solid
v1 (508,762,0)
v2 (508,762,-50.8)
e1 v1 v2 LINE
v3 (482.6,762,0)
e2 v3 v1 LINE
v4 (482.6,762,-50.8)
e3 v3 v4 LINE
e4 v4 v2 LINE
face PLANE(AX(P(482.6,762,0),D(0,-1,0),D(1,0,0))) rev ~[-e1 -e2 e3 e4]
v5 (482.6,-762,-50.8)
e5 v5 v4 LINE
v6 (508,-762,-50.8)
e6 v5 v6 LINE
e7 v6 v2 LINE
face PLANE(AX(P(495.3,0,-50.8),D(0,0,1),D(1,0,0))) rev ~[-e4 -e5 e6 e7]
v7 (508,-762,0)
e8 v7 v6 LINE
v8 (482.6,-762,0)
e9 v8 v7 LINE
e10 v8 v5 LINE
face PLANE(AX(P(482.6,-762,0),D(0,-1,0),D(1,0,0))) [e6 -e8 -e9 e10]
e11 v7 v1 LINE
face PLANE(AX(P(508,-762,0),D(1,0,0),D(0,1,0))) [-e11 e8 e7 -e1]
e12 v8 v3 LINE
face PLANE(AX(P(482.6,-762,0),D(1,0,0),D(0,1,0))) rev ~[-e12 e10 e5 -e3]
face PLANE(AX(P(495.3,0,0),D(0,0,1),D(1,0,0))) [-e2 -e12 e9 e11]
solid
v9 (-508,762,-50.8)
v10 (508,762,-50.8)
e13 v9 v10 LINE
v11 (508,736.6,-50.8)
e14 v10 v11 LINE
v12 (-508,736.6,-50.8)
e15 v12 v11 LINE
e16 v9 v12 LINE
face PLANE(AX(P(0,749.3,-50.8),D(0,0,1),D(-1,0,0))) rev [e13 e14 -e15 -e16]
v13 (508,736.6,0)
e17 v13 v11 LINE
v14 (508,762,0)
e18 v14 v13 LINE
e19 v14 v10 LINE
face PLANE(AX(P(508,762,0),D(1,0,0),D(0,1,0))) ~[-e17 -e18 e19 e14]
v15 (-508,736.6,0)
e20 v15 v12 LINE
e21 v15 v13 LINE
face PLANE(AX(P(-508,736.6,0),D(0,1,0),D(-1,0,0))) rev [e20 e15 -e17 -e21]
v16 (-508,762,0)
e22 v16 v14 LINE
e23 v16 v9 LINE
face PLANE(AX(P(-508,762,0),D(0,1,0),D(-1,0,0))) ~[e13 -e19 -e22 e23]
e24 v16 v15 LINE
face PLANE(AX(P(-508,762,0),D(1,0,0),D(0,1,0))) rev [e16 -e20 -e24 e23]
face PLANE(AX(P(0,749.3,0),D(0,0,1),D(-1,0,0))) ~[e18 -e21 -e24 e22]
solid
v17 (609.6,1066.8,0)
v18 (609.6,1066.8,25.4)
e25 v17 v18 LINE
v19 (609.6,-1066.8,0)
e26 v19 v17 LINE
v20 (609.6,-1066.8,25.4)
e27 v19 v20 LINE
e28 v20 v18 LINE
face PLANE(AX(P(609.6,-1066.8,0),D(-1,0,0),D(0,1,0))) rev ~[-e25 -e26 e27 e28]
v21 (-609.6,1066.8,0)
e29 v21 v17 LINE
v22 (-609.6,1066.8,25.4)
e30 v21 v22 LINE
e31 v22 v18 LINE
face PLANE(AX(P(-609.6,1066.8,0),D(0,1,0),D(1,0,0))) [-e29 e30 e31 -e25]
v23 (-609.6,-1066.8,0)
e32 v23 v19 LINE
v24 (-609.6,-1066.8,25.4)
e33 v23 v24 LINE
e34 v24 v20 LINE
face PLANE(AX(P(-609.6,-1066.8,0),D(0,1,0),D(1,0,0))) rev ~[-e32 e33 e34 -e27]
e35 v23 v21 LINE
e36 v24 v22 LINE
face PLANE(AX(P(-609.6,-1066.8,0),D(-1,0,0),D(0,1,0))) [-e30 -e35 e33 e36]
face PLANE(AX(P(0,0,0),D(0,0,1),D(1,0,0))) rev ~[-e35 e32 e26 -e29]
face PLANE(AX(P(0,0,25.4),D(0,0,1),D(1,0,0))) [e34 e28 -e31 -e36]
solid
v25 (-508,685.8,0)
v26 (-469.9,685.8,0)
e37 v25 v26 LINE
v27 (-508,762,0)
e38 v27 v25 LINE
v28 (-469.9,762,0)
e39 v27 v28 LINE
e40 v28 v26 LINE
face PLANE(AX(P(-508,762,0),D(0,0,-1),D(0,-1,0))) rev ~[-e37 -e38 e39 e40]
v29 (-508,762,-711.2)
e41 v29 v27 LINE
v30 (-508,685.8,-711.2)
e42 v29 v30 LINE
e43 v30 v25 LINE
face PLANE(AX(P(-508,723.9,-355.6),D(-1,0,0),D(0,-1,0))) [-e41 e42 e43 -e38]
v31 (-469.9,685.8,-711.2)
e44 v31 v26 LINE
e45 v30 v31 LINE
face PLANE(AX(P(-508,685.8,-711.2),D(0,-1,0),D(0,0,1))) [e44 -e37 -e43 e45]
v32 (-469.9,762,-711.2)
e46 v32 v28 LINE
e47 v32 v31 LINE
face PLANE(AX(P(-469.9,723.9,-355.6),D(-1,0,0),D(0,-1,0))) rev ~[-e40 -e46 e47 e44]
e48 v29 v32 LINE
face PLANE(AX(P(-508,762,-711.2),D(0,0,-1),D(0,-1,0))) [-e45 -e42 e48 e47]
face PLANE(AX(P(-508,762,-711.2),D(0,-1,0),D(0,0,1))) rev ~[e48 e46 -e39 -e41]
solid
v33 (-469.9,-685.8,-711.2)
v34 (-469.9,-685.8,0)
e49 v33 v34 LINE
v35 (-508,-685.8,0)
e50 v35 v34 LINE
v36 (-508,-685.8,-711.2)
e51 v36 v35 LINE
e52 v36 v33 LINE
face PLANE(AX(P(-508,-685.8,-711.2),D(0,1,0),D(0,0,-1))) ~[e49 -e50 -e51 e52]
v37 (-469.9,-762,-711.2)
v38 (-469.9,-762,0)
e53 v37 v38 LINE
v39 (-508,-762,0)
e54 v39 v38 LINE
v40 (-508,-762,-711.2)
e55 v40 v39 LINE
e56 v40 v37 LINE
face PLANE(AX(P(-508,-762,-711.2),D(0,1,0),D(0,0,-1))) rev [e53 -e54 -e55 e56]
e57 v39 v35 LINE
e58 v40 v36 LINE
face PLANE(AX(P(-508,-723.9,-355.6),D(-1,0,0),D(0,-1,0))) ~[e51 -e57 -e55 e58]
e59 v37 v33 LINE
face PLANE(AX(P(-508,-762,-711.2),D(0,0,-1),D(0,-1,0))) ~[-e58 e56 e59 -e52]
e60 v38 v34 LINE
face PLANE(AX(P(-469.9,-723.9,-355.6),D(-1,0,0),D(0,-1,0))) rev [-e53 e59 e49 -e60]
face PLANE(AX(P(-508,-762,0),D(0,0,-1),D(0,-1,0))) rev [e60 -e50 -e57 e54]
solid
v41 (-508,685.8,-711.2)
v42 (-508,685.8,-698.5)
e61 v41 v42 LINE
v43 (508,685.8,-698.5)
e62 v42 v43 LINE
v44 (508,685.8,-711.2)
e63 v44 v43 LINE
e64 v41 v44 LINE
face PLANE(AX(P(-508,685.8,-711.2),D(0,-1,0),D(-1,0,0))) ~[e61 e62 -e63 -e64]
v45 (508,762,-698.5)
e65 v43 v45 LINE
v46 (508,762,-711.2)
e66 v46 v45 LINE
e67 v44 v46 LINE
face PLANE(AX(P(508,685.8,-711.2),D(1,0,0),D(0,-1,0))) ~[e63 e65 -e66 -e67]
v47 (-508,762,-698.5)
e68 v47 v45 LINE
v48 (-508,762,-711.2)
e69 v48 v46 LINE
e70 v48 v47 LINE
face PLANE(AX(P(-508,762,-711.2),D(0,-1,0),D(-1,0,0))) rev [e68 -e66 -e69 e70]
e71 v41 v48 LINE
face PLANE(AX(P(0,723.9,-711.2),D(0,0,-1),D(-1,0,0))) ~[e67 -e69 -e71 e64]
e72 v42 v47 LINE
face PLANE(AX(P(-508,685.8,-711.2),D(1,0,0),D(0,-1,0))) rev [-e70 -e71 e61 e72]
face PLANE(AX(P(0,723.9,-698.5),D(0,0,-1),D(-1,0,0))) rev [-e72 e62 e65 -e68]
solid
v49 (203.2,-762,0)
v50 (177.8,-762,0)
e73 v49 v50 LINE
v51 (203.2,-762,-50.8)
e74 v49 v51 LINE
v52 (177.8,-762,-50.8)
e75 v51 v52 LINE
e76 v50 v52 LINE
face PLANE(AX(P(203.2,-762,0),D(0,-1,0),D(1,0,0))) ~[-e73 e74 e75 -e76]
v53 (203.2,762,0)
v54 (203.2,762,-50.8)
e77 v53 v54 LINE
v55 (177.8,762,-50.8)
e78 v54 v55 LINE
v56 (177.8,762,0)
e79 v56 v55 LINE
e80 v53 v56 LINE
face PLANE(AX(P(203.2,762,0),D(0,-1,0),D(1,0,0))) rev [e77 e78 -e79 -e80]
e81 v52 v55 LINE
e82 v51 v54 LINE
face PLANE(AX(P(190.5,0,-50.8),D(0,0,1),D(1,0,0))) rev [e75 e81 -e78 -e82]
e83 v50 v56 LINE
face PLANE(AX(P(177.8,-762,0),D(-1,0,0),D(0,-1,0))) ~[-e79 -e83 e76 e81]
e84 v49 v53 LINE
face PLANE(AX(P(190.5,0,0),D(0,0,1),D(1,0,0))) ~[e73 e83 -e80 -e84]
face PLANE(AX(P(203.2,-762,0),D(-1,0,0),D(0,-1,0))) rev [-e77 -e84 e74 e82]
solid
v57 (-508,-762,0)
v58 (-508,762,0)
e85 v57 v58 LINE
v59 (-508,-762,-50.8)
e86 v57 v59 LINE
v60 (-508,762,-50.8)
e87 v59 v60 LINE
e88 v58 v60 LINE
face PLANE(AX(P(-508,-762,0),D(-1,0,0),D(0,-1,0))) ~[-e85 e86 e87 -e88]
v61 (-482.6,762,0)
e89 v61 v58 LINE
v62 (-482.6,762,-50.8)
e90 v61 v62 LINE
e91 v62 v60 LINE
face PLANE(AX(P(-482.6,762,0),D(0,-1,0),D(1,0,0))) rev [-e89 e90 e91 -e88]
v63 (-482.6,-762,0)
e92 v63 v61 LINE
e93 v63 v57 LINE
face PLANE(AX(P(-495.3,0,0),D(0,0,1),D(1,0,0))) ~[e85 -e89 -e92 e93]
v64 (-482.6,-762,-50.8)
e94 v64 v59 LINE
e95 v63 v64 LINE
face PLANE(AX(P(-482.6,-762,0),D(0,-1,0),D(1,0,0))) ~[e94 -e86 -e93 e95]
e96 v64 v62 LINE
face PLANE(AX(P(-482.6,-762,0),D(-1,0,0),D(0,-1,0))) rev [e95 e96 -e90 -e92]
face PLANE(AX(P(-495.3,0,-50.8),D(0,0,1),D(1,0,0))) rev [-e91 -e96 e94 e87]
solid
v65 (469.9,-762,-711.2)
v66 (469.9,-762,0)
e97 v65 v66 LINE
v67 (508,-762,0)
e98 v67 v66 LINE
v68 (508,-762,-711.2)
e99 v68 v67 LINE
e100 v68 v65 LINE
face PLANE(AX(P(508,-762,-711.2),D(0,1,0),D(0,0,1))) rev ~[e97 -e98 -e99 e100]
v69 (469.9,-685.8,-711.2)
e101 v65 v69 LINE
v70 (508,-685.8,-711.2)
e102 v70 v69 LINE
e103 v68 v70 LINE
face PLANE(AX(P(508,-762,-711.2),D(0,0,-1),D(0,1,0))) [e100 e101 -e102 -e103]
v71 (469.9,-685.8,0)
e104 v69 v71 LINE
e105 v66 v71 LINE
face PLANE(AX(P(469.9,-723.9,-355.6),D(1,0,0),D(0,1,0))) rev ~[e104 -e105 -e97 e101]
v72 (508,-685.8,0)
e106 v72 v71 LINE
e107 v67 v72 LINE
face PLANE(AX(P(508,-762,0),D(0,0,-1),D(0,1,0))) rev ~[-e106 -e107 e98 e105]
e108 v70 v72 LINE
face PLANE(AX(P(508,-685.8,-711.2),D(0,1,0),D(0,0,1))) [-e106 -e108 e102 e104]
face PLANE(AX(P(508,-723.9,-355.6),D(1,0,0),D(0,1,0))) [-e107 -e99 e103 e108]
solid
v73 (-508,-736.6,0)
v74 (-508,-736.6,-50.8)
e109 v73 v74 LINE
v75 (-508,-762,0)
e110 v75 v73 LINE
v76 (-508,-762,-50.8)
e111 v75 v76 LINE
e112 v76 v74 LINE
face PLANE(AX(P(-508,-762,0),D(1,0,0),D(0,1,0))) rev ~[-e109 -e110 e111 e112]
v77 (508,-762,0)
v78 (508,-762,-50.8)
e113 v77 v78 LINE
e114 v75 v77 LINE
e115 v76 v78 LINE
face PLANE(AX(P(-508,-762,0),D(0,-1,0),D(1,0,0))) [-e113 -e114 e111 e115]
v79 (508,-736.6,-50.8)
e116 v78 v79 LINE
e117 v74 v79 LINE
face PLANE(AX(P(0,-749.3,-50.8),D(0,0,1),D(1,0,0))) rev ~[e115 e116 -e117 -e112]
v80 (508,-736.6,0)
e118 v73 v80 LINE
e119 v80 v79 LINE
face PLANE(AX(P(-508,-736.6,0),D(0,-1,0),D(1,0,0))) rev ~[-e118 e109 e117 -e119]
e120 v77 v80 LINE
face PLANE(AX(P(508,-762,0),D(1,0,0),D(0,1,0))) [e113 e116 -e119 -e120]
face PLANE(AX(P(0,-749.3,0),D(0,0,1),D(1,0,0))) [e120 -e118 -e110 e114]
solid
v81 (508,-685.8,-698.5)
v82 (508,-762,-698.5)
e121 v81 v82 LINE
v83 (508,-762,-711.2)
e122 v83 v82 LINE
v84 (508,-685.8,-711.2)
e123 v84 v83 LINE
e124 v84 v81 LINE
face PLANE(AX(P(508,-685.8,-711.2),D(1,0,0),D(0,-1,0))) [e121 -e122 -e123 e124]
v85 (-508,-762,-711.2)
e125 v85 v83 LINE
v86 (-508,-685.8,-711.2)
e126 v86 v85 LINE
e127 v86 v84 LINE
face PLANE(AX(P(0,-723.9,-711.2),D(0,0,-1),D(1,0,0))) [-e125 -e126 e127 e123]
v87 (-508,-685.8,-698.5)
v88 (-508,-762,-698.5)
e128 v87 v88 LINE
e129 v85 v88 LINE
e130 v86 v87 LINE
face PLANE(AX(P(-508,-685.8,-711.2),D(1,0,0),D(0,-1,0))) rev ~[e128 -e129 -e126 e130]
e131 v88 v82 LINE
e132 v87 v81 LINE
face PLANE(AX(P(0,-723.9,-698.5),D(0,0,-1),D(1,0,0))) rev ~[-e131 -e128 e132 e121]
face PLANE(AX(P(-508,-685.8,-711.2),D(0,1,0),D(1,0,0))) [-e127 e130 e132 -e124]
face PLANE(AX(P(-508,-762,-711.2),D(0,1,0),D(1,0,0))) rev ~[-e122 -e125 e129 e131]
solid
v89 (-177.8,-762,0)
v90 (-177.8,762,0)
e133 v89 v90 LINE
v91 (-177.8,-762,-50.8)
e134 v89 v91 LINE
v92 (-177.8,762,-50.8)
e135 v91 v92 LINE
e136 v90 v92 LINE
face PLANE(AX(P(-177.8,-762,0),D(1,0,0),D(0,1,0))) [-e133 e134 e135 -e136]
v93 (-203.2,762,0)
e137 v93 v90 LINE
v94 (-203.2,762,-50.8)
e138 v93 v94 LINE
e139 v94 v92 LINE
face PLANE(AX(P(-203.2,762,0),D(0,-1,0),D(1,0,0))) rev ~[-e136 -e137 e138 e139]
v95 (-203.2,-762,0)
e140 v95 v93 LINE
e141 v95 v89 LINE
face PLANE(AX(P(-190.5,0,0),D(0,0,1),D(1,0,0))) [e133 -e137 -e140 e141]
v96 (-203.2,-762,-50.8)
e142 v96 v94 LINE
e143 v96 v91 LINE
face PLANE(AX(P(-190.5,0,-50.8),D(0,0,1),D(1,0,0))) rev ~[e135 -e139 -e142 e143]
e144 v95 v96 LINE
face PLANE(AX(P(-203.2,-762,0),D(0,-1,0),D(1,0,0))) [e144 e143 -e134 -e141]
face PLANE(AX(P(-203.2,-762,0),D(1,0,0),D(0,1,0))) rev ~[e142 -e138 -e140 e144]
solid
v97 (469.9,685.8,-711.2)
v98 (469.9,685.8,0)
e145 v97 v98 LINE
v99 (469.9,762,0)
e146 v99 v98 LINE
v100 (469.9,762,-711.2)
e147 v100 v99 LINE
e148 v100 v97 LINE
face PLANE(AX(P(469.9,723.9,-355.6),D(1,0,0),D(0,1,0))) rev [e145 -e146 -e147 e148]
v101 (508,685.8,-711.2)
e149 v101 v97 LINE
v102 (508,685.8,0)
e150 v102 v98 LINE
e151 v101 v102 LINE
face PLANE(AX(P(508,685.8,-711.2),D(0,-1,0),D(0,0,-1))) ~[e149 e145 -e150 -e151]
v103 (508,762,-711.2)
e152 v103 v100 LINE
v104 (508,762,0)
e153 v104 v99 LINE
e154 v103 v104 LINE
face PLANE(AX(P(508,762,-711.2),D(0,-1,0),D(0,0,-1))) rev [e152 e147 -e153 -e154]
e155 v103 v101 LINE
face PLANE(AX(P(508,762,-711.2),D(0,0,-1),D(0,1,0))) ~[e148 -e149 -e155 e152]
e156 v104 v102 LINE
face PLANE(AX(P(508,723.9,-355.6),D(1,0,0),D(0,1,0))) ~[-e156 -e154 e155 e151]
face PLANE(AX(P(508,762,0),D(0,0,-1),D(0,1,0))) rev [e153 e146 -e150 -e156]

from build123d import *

# Parameters (mm, degrees)
F0_W      = 1219.2
F0_H      = 2133.6
F1_DEPTH  = 25.4
F2_W      = 25.4
F2_H      = 1524
F3_DEPTH  = 50.8
F5_W      = 1016
F5_H      = 25.4
F6_DEPTH  = 50.8
F8_W      = 76.2
F8_H      = 711.2
F9_DEPTH  = 38.1
F12_W     = 1016
F12_H     = 76.2
F13_DEPTH = 12.7
F15_W     = 25.4
F15_H     = 1524
F16_DEPTH = 50.8


# Not quite as in the source:
# - a feature names something its author has since deleted; it is built from what else it names


with BuildPart() as f1:
    # F0 (on Top) → F1 (new body)
    with BuildSketch(Plane.XY):
        Rectangle(F0_W, F0_H)
    extrude(amount=F1_DEPTH)


with BuildPart() as f3:
    # F2 (on face) → F3 (new body)
    with BuildSketch(Plane.XY):
        with Locations((495.3, 0)):
            Rectangle(F2_W, F2_H)
    extrude(amount=-F3_DEPTH)


with BuildPart() as f4_1:
    # F4: instance of F3
    add(f3.part.mirror(Plane.YZ))


with BuildPart() as f6:
    # F5 (on face) → F6 (new body)
    with BuildSketch(Plane.XY):
        with Locations((0, -749.3)):
            Rectangle(F5_W, F5_H)
    extrude(amount=-F6_DEPTH)


with BuildPart() as f7_1:
    # F7: instance of F6
    add(f6.part.mirror(Plane.XZ))


with BuildPart() as f9:
    # F8 (on face) → F9 (new body)
    with BuildSketch(Plane(origin=(-508, 0, 0), x_dir=(0, -1, 0), z_dir=(-1, 0, 0))):
        with Locations((-723.9, -355.6)):
            Rectangle(F8_W, F8_H)
    extrude(amount=-F9_DEPTH)


with BuildPart() as f10_1:
    # F10: instance of F9
    add(f9.part.mirror(Plane.YZ))


with BuildPart() as f11_1:
    # F11: instance of F10_1
    add(f10_1.part.mirror(Plane.XZ))


with BuildPart() as f11_2:
    # F11: instance of F9
    add(f9.part.mirror(Plane.XZ))


with BuildPart() as f13:
    # F12 (on face) → F13 (new body)
    with BuildSketch(Plane(origin=(0, 0, -711.2), x_dir=(1, 0, 0), z_dir=(0, 0, -1))):
        with Locations((0, 723.9)):
            Rectangle(F12_W, F12_H)
    extrude(amount=-F13_DEPTH)


with BuildPart() as f14_1:
    # F14: instance of F13
    add(f13.part.mirror(Plane.XZ))


with BuildPart() as f16:
    # F15 (on face) → F16 (new body)
    with BuildSketch(Plane.XY):
        with Locations((-190.5, 0)):
            Rectangle(F15_W, F15_H)
    extrude(amount=-F16_DEPTH)


with BuildPart() as f17_1:
    # F17: instance of F16
    add(f16.part.mirror(Plane.YZ))


solid = Compound([f1.part, f3.part, f4_1.part, f6.part, f7_1.part, f9.part, f10_1.part, f11_1.part, f11_2.part, f13.part, f14_1.part, f16.part, f17_1.part])
